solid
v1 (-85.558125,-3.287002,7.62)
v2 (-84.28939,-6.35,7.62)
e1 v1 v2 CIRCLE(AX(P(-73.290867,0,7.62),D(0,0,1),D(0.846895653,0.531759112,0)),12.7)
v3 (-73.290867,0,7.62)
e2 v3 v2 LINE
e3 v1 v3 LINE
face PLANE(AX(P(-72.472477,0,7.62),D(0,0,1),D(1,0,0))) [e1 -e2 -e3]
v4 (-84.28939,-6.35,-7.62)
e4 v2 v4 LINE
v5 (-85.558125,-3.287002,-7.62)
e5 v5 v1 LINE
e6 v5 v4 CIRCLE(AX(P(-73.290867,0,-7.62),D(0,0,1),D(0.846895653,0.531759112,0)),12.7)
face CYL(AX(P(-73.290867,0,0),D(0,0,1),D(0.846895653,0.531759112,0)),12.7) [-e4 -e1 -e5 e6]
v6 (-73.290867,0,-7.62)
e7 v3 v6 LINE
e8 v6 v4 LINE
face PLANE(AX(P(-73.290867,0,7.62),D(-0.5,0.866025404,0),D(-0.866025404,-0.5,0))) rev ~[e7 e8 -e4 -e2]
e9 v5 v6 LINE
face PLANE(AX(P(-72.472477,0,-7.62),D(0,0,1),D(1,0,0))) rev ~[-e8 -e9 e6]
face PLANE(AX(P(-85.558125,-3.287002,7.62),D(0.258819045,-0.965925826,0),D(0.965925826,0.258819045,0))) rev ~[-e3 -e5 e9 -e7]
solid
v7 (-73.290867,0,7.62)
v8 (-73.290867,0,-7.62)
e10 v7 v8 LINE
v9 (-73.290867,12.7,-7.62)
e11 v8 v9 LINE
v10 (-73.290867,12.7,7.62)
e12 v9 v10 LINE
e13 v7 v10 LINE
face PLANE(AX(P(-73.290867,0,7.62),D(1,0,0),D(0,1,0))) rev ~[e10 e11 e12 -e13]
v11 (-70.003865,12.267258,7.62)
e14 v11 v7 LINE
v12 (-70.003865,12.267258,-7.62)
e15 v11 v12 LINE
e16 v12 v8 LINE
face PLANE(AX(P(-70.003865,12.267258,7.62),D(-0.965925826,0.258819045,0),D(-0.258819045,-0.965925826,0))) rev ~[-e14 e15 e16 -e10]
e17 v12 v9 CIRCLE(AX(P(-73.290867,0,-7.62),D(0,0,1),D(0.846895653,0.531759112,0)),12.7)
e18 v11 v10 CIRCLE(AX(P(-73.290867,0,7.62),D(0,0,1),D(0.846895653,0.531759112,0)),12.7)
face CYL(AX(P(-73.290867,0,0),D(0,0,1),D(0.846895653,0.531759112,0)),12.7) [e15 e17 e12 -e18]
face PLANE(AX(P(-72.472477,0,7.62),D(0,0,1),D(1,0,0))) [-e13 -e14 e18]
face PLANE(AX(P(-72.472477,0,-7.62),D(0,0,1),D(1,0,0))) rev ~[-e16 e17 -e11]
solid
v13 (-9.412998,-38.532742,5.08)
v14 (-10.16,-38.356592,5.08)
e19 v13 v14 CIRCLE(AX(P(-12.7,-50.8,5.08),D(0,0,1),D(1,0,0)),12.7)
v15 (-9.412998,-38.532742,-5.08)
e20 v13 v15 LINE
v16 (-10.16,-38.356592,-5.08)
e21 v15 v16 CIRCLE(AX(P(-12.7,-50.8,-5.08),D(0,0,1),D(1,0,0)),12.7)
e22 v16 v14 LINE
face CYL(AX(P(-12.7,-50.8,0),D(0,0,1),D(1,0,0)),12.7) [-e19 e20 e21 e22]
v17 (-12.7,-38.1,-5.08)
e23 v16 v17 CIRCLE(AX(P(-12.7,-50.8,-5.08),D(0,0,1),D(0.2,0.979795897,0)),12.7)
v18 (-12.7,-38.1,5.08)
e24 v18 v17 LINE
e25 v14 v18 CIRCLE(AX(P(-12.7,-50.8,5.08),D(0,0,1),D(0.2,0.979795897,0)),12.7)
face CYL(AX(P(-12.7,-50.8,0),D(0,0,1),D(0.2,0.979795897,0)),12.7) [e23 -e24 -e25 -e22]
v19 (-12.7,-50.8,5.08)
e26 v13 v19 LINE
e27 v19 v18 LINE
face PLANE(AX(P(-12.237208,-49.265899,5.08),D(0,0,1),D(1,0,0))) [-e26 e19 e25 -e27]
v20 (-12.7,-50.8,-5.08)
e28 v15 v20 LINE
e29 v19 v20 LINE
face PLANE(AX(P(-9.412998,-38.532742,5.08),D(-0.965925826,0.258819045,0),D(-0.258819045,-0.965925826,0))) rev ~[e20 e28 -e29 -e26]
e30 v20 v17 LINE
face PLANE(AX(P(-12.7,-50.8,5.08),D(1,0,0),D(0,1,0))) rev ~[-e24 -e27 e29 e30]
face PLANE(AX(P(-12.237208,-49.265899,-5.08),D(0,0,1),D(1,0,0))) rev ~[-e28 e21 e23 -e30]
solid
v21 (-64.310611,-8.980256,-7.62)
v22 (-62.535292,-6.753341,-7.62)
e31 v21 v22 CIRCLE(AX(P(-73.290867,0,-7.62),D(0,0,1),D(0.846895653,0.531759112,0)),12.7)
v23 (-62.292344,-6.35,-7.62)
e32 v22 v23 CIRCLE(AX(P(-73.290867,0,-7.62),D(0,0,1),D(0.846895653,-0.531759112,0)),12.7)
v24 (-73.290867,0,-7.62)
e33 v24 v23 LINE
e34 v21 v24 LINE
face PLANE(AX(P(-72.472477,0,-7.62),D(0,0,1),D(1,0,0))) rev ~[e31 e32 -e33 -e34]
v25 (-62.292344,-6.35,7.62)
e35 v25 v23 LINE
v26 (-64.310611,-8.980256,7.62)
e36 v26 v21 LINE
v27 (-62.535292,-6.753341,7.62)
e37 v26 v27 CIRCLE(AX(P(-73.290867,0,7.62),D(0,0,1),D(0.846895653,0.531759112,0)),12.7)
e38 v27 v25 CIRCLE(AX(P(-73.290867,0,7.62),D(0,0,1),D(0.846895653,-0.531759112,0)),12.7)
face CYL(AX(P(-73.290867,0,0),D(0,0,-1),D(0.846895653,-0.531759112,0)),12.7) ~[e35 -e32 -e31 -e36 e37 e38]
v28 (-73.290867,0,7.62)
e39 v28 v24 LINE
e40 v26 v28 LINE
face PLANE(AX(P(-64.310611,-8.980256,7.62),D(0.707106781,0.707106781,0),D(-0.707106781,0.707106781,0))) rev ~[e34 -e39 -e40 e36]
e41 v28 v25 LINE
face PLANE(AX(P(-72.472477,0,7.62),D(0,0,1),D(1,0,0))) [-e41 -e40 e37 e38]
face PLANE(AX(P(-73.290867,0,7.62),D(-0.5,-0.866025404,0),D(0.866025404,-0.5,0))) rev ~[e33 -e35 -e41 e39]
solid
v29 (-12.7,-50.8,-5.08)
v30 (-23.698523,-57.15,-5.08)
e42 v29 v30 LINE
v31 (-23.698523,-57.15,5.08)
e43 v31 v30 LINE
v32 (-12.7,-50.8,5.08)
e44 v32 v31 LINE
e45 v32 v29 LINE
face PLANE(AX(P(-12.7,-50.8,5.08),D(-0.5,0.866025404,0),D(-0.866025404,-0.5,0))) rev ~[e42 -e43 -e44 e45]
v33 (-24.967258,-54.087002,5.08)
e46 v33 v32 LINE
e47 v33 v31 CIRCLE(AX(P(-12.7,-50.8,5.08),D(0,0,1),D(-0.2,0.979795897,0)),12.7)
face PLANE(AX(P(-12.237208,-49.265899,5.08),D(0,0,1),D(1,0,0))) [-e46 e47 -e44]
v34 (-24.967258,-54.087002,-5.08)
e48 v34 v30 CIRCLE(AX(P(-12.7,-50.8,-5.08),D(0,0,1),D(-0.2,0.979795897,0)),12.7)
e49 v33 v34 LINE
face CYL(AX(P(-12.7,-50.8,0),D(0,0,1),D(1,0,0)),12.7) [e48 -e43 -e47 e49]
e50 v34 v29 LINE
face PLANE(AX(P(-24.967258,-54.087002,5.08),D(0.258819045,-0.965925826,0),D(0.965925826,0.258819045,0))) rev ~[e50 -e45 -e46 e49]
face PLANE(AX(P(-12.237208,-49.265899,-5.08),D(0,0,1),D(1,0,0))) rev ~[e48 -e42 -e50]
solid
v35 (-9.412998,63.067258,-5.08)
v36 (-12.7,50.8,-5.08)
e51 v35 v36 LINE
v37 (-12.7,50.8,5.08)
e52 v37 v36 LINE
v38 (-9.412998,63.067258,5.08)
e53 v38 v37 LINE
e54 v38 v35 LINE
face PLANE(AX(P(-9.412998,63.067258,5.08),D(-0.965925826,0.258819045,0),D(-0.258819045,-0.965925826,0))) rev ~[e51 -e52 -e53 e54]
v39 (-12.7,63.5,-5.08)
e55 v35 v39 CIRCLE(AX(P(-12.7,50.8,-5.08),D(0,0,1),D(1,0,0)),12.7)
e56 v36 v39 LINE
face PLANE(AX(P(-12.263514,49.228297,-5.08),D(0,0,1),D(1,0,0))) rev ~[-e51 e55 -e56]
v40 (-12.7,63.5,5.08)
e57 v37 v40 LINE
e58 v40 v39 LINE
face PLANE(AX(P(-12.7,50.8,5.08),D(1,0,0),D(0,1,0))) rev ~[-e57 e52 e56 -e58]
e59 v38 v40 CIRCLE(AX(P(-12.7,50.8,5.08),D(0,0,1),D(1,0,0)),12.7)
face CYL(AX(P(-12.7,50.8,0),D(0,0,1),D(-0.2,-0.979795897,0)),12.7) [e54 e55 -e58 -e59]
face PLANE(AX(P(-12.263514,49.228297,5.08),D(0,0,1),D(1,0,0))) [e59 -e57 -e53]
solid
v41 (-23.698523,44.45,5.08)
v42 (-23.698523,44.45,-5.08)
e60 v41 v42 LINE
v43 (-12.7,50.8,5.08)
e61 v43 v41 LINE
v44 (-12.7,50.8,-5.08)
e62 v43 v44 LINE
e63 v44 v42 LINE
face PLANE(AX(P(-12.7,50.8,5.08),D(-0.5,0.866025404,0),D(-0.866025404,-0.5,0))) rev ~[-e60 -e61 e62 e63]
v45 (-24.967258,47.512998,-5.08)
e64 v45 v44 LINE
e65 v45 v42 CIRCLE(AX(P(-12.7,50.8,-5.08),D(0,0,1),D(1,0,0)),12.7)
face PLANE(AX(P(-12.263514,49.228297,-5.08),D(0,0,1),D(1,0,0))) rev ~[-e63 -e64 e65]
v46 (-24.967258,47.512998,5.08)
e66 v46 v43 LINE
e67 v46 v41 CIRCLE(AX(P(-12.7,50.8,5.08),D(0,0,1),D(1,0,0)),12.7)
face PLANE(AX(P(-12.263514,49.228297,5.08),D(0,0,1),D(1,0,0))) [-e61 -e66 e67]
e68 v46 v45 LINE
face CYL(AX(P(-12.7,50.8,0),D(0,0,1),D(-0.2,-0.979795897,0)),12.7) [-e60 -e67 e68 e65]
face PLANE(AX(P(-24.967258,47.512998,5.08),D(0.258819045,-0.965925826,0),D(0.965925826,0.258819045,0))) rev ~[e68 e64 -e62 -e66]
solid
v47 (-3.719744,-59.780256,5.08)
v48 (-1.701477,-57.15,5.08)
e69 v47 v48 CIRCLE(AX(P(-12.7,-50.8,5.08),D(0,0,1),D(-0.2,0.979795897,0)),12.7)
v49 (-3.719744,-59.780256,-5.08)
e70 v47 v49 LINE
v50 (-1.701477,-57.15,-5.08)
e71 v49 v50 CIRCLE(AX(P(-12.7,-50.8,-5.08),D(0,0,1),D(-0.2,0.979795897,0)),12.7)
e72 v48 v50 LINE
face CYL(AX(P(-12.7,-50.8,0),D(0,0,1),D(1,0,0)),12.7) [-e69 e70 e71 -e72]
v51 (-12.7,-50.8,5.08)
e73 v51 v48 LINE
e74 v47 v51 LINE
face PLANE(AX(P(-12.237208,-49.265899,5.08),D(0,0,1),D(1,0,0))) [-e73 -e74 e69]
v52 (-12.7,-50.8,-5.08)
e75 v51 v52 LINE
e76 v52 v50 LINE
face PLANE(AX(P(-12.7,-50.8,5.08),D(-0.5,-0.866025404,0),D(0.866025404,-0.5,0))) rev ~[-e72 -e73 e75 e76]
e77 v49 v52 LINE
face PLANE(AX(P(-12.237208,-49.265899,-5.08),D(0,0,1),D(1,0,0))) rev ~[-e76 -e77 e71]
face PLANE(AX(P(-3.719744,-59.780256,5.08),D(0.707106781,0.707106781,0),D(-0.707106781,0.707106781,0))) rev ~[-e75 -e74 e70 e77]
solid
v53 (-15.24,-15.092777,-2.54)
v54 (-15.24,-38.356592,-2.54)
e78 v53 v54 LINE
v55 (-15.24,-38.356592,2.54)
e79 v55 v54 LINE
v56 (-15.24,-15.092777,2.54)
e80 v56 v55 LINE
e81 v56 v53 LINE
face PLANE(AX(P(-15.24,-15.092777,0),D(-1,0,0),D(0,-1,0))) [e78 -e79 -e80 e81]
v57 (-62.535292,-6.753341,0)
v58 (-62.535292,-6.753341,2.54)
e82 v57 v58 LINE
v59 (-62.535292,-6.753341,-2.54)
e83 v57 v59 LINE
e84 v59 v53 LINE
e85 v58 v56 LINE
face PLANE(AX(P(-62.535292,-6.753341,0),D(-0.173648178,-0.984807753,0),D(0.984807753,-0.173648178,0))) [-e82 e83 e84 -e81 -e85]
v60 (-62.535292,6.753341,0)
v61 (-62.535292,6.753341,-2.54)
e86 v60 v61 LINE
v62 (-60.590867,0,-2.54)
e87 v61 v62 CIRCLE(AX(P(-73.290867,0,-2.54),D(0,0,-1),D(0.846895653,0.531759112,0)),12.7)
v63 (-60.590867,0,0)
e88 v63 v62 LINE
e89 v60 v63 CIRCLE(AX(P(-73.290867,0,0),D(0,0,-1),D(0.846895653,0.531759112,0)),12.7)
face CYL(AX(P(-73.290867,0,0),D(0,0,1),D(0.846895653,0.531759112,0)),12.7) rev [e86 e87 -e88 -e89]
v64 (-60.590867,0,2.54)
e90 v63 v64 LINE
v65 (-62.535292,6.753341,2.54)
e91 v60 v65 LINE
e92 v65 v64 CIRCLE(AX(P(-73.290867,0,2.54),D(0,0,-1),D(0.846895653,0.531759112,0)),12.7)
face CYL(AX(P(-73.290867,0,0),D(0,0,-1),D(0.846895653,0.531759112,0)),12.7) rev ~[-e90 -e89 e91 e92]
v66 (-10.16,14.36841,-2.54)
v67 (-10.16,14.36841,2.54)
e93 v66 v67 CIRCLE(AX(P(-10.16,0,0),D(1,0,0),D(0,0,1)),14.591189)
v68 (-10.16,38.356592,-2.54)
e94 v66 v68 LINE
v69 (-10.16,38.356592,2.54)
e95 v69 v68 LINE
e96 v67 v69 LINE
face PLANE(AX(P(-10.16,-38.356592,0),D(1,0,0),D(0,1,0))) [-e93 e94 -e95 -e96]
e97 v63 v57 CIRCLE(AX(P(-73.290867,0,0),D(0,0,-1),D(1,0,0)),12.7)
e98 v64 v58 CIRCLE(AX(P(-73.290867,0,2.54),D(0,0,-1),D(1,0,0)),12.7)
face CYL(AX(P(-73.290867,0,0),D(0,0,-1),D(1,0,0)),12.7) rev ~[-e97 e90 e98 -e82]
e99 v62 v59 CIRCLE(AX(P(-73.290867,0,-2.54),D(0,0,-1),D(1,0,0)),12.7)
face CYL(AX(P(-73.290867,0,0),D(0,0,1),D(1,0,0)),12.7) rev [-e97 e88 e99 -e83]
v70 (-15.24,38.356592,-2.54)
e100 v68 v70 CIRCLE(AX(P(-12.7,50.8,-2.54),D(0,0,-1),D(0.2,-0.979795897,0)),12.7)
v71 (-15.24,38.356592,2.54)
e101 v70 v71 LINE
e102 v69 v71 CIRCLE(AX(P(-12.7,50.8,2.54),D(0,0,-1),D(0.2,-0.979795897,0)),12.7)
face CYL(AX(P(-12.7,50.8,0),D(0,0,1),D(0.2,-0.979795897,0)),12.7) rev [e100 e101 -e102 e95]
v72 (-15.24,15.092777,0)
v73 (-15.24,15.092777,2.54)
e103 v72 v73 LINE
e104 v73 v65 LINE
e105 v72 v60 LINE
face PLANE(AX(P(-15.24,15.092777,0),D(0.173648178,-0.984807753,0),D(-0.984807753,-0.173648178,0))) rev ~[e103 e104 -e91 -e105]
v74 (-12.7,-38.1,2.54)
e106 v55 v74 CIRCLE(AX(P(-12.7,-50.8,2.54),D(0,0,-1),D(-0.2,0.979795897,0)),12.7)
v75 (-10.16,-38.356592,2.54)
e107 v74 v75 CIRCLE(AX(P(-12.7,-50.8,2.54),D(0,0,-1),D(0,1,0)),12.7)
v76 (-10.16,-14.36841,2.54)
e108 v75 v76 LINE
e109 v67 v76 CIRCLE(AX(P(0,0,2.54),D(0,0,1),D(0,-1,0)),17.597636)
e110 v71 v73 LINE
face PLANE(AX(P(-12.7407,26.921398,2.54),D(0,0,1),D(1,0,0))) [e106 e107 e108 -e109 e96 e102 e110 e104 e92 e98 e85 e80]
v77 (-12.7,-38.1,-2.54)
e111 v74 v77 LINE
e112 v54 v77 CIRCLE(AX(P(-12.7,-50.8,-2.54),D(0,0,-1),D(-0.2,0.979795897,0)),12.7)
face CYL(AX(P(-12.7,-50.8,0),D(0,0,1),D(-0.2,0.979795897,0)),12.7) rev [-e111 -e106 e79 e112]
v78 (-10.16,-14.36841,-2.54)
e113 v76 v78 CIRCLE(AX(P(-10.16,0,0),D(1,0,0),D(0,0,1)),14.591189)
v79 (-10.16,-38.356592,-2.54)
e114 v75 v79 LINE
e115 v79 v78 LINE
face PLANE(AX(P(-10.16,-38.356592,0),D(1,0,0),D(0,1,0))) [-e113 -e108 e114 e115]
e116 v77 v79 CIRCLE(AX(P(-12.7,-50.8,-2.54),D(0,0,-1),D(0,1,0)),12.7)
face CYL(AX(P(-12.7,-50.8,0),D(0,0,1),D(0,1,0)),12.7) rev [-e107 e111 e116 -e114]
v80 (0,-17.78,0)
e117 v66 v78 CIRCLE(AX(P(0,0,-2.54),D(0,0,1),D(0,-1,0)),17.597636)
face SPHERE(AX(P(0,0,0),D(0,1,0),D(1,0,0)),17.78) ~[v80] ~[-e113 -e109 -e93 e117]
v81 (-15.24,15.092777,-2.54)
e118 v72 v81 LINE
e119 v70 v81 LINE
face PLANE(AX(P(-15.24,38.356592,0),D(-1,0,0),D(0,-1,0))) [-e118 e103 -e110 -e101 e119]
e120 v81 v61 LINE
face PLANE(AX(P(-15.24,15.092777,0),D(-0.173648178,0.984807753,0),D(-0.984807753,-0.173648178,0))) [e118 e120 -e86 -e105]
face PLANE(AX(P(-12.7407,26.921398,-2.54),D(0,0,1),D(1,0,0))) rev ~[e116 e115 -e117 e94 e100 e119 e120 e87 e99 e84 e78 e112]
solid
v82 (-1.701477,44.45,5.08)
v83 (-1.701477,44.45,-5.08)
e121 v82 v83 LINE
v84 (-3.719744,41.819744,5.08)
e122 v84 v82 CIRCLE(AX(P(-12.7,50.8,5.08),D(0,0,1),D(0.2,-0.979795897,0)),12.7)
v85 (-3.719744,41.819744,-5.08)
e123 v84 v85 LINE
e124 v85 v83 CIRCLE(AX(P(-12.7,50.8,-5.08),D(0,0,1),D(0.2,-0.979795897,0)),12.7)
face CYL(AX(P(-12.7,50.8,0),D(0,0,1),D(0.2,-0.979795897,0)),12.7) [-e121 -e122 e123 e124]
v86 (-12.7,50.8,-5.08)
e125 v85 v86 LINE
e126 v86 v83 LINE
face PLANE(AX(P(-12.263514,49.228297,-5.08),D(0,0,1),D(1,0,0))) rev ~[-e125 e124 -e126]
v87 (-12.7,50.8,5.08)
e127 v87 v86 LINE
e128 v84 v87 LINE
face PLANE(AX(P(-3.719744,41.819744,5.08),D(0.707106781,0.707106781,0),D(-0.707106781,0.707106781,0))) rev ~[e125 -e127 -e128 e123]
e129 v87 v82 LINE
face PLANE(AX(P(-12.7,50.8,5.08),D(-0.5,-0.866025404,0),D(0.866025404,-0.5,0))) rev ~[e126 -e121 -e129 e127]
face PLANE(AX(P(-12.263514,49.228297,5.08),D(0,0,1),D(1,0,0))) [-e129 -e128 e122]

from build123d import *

# Parameters (mm, degrees)
F2_DEPTH  = 2.54
F3_DEPTH  = 5.08
F4_DEPTH  = 7.62
F8_DEPTH  = 25.4
F10_DEPTH = 22.861
F12_DEPTH = 25.401


# Not quite as in the source:
# - the program builds the solid bodies; features that only make, move or delete a surface that nothing else refers to are left out


with BuildPart() as f1:
    # F0 (on Top) → F1 (revolve)
    with BuildSketch(Plane.XY):
        with BuildLine():
            Line((0, 0), (0, -17.78))
            ThreePointArc((0, -17.78), (17.78, 0), (0, 17.78))
            Line((0, 17.78), (0, 0))
        make_face()
    revolve(axis=Axis((0, -8.89, 0), (0, -1, 0)))

    # F0 (on Top) → F2 (join, symmetric)
    with BuildSketch(Plane.XY):
        with BuildLine():
            Line((-15.24, 15.092776814), (-10.16, 15.988517876))
            Line((-10.16, 15.988517876), (-10.16, 38.3565921067))
            ThreePointArc((-10.16, 38.3565921067), (-12.7, 38.1), (-15.24, 38.3565921067))
            Line((-15.24, 38.3565921067), (-15.24, 15.092776814))
        make_face()
        Polygon((-15.24, -15.092776814), (-10.16, -15.988517876), (-10.16, 0), (-10.16, 15.988517876), (-15.24, 15.092776814), (-15.24, 0), align=None)
        with BuildLine():
            Line((-62.5352923163, -6.7533407181), (-15.24, -15.092776814))
            Line((-15.24, -15.092776814), (-15.24, 0))
            Line((-15.24, 0), (-15.24, 15.092776814))
            Line((-15.24, 15.092776814), (-62.5352923163, 6.7533407181))
            ThreePointArc((-62.5352923163, 6.7533407181), (-61.086650628, 3.5138440574), (-60.5908671101, 0))
            ThreePointArc((-60.5908671101, 0), (-61.086650628, -3.5138440574), (-62.5352923163, -6.7533407181))
        make_face()
        with BuildLine():
            Line((-10.16, -38.3565921067), (-10.16, -15.988517876))
            Line((-10.16, -15.988517876), (-15.24, -15.092776814))
            Line((-15.24, -15.092776814), (-15.24, -38.3565921067))
            ThreePointArc((-15.24, -38.3565921067), (-13.9764638175, -38.1643108568), (-12.7, -38.1))
            ThreePointArc((-12.7, -38.1), (-11.4235361825, -38.1643108568), (-10.16, -38.3565921067))
        make_face()
    extrude(amount=F2_DEPTH, both=True)


with BuildPart() as f3:
    # F0 (on Top) → F3 (new body, symmetric)
    with BuildSketch(Plane.XY):
        with BuildLine():
            Line((-10.16, 47.2073256969), (-10.16, 38.3565921067))
            ThreePointArc((-10.16, 38.3565921067), (-2.8626223006, 42.7678147432), (0, 50.8))
            ThreePointArc((0, 50.8), (-20.7321852568, 60.6373776994), (-15.24, 38.3565921067))
            Line((-15.24, 38.3565921067), (-15.24, 46.6368459165))
            Line((-15.24, 46.6368459165), (-10.16, 47.2073256969))
        make_face()
        with BuildLine():
            ThreePointArc((-15.24, 38.3565921067), (-12.7, 38.1), (-10.16, 38.3565921067))
            Line((-10.16, 38.3565921067), (-10.16, 47.2073256969))
            Line((-10.16, 47.2073256969), (-15.24, 46.6368459165))
            Line((-15.24, 46.6368459165), (-15.24, 38.3565921067))
        make_face()
    extrude(amount=F3_DEPTH, both=True)

    # F7 (on face) → F8 (cut)
    with BuildSketch(Plane.XY.offset(5.08)):
        with BuildLine():
            Line((-9.4129981272, 63.0672579939), (-12.7, 50.8))
            Line((-12.7, 50.8), (-1.7014773719, 44.45))
            ThreePointArc((-1.7014773719, 44.45), (-0.4327420061, 47.5129981272), (0, 50.8))
            ThreePointArc((0, 50.8), (-2.6244125783, 58.5312701484), (-9.4129981272, 63.0672579939))
        make_face()
        with BuildLine():
            Line((-24.9672579939, 47.5129981272), (-12.7, 50.8))
            Line((-12.7, 50.8), (-12.7, 63.5))
            ThreePointArc((-12.7, 63.5), (-22.7755874217, 58.5312701484), (-24.9672579939, 47.5129981272))
        make_face()
        with BuildLine():
            Line((-3.7197438789, 41.8197438789), (-12.7, 50.8))
            Line((-12.7, 50.8), (-23.6985226281, 44.45))
            ThreePointArc((-23.6985226281, 44.45), (-14.3576826412, 38.2086502606), (-3.7197438789, 41.8197438789))
        make_face()
    extrude(amount=-F8_DEPTH, mode=Mode.SUBTRACT)


with BuildPart() as f3b:
    # F0 (on Top) → F3, piece 2 (new body, symmetric)
    with BuildSketch(Plane.XY):
        with BuildLine():
            ThreePointArc((0, -50.8), (-2.8626223006, -42.7678147432), (-10.16, -38.3565921067))
            Line((-10.16, -38.3565921067), (-10.16, -45.2106446028))
            Line((-10.16, -45.2106446028), (-12.7, -44.8303223014))
            Line((-12.7, -44.8303223014), (-15.24, -44.45))
            Line((-15.24, -44.45), (-15.24, -38.3565921067))
            ThreePointArc((-15.24, -38.3565921067), (-20.7321852568, -60.6373776994), (0, -50.8))
        make_face()
        with BuildLine():
            ThreePointArc((-12.7, -38.1), (-13.9764638175, -38.1643108568), (-15.24, -38.3565921067))
            Line((-15.24, -38.3565921067), (-15.24, -44.45))
            Line((-15.24, -44.45), (-12.7, -44.8303223014))
            Line((-12.7, -44.8303223014), (-12.7, -38.1))
        make_face()
        with BuildLine():
            Line((-10.16, -45.2106446028), (-10.16, -38.3565921067))
            ThreePointArc((-10.16, -38.3565921067), (-11.4235361825, -38.1643108568), (-12.7, -38.1))
            Line((-12.7, -38.1), (-12.7, -44.8303223014))
            Line((-12.7, -44.8303223014), (-10.16, -45.2106446028))
        make_face()
    extrude(amount=F3_DEPTH, both=True)

    # F6 (on face) → F10 (cut, through all)
    with BuildSketch(Plane.XY.offset(5.08)):
        with BuildLine():
            Line((-9.4129981272, -38.5327420061), (-12.7, -50.8))
            Line((-12.7, -50.8), (-1.7014773719, -57.15))
            ThreePointArc((-1.7014773719, -57.15), (-0.4327420061, -54.0870018728), (0, -50.8))
            ThreePointArc((0, -50.8), (-2.6244125783, -43.0687298516), (-9.4129981272, -38.5327420061))
        make_face()
        with BuildLine():
            Line((-24.9672579939, -54.0870018728), (-12.7, -50.8))
            Line((-12.7, -50.8), (-12.7, -38.1))
            ThreePointArc((-12.7, -38.1), (-22.7755874217, -43.0687298516), (-24.9672579939, -54.0870018728))
        make_face()
        with BuildLine():
            Line((-3.7197438789, -59.7802561211), (-12.7, -50.8))
            Line((-12.7, -50.8), (-23.6985226281, -57.15))
            ThreePointArc((-23.6985226281, -57.15), (-14.3576826412, -63.3913497394), (-3.7197438789, -59.7802561211))
        make_face()
    extrude(amount=-F10_DEPTH, mode=Mode.SUBTRACT)


with BuildPart() as f4:
    # F0 (on Top) → F4 (new body, symmetric)
    with BuildSketch(Plane.XY):
        with BuildLine():
            ThreePointArc((-62.5352923163, 6.7533407181), (-85.9908671101, 0), (-62.5352923163, -6.7533407181))
            ThreePointArc((-62.5352923163, -6.7533407181), (-61.086650628, -3.5138440574), (-60.5908671101, 0))
            ThreePointArc((-60.5908671101, 0), (-61.086650628, 3.5138440574), (-62.5352923163, 6.7533407181))
        make_face()
    extrude(amount=F4_DEPTH, both=True)

    # F5 (on face) → F12 (cut, through all)
    with BuildSketch(Plane.XY.offset(7.62)):
        with BuildLine():
            Line((-85.5581251039, -3.2870018728), (-73.2908671101, 0))
            Line((-73.2908671101, 0), (-73.2908671101, 12.7))
            ThreePointArc((-73.2908671101, 12.7), (-83.3664545318, 7.7312701484), (-85.5581251039, -3.2870018728))
        make_face()
        with BuildLine():
            Line((-70.0038652373, 12.2672579939), (-73.2908671101, 0))
            Line((-73.2908671101, 0), (-62.292344482, -6.35))
            ThreePointArc((-62.292344482, -6.35), (-61.0236091162, -3.2870018728), (-60.5908671101, 0))
            ThreePointArc((-60.5908671101, 0), (-61.086650628, 3.5138440574), (-62.5352923163, 6.7533407181))
            ThreePointArc((-62.5352923163, 6.7533407181), (-65.7477039281, 10.2171761857), (-70.0038652373, 12.2672579939))
        make_face()
        with BuildLine():
            Line((-64.310610989, -8.9802561211), (-73.2908671101, 0))
            Line((-73.2908671101, 0), (-84.2893897381, -6.35))
            ThreePointArc((-84.2893897381, -6.35), (-74.9485497512, -12.5913497394), (-64.310610989, -8.9802561211))
        make_face()
    extrude(amount=-F12_DEPTH, mode=Mode.SUBTRACT)


solid = Compound([f1.part, f3.part, f3b.part, f4.part])
